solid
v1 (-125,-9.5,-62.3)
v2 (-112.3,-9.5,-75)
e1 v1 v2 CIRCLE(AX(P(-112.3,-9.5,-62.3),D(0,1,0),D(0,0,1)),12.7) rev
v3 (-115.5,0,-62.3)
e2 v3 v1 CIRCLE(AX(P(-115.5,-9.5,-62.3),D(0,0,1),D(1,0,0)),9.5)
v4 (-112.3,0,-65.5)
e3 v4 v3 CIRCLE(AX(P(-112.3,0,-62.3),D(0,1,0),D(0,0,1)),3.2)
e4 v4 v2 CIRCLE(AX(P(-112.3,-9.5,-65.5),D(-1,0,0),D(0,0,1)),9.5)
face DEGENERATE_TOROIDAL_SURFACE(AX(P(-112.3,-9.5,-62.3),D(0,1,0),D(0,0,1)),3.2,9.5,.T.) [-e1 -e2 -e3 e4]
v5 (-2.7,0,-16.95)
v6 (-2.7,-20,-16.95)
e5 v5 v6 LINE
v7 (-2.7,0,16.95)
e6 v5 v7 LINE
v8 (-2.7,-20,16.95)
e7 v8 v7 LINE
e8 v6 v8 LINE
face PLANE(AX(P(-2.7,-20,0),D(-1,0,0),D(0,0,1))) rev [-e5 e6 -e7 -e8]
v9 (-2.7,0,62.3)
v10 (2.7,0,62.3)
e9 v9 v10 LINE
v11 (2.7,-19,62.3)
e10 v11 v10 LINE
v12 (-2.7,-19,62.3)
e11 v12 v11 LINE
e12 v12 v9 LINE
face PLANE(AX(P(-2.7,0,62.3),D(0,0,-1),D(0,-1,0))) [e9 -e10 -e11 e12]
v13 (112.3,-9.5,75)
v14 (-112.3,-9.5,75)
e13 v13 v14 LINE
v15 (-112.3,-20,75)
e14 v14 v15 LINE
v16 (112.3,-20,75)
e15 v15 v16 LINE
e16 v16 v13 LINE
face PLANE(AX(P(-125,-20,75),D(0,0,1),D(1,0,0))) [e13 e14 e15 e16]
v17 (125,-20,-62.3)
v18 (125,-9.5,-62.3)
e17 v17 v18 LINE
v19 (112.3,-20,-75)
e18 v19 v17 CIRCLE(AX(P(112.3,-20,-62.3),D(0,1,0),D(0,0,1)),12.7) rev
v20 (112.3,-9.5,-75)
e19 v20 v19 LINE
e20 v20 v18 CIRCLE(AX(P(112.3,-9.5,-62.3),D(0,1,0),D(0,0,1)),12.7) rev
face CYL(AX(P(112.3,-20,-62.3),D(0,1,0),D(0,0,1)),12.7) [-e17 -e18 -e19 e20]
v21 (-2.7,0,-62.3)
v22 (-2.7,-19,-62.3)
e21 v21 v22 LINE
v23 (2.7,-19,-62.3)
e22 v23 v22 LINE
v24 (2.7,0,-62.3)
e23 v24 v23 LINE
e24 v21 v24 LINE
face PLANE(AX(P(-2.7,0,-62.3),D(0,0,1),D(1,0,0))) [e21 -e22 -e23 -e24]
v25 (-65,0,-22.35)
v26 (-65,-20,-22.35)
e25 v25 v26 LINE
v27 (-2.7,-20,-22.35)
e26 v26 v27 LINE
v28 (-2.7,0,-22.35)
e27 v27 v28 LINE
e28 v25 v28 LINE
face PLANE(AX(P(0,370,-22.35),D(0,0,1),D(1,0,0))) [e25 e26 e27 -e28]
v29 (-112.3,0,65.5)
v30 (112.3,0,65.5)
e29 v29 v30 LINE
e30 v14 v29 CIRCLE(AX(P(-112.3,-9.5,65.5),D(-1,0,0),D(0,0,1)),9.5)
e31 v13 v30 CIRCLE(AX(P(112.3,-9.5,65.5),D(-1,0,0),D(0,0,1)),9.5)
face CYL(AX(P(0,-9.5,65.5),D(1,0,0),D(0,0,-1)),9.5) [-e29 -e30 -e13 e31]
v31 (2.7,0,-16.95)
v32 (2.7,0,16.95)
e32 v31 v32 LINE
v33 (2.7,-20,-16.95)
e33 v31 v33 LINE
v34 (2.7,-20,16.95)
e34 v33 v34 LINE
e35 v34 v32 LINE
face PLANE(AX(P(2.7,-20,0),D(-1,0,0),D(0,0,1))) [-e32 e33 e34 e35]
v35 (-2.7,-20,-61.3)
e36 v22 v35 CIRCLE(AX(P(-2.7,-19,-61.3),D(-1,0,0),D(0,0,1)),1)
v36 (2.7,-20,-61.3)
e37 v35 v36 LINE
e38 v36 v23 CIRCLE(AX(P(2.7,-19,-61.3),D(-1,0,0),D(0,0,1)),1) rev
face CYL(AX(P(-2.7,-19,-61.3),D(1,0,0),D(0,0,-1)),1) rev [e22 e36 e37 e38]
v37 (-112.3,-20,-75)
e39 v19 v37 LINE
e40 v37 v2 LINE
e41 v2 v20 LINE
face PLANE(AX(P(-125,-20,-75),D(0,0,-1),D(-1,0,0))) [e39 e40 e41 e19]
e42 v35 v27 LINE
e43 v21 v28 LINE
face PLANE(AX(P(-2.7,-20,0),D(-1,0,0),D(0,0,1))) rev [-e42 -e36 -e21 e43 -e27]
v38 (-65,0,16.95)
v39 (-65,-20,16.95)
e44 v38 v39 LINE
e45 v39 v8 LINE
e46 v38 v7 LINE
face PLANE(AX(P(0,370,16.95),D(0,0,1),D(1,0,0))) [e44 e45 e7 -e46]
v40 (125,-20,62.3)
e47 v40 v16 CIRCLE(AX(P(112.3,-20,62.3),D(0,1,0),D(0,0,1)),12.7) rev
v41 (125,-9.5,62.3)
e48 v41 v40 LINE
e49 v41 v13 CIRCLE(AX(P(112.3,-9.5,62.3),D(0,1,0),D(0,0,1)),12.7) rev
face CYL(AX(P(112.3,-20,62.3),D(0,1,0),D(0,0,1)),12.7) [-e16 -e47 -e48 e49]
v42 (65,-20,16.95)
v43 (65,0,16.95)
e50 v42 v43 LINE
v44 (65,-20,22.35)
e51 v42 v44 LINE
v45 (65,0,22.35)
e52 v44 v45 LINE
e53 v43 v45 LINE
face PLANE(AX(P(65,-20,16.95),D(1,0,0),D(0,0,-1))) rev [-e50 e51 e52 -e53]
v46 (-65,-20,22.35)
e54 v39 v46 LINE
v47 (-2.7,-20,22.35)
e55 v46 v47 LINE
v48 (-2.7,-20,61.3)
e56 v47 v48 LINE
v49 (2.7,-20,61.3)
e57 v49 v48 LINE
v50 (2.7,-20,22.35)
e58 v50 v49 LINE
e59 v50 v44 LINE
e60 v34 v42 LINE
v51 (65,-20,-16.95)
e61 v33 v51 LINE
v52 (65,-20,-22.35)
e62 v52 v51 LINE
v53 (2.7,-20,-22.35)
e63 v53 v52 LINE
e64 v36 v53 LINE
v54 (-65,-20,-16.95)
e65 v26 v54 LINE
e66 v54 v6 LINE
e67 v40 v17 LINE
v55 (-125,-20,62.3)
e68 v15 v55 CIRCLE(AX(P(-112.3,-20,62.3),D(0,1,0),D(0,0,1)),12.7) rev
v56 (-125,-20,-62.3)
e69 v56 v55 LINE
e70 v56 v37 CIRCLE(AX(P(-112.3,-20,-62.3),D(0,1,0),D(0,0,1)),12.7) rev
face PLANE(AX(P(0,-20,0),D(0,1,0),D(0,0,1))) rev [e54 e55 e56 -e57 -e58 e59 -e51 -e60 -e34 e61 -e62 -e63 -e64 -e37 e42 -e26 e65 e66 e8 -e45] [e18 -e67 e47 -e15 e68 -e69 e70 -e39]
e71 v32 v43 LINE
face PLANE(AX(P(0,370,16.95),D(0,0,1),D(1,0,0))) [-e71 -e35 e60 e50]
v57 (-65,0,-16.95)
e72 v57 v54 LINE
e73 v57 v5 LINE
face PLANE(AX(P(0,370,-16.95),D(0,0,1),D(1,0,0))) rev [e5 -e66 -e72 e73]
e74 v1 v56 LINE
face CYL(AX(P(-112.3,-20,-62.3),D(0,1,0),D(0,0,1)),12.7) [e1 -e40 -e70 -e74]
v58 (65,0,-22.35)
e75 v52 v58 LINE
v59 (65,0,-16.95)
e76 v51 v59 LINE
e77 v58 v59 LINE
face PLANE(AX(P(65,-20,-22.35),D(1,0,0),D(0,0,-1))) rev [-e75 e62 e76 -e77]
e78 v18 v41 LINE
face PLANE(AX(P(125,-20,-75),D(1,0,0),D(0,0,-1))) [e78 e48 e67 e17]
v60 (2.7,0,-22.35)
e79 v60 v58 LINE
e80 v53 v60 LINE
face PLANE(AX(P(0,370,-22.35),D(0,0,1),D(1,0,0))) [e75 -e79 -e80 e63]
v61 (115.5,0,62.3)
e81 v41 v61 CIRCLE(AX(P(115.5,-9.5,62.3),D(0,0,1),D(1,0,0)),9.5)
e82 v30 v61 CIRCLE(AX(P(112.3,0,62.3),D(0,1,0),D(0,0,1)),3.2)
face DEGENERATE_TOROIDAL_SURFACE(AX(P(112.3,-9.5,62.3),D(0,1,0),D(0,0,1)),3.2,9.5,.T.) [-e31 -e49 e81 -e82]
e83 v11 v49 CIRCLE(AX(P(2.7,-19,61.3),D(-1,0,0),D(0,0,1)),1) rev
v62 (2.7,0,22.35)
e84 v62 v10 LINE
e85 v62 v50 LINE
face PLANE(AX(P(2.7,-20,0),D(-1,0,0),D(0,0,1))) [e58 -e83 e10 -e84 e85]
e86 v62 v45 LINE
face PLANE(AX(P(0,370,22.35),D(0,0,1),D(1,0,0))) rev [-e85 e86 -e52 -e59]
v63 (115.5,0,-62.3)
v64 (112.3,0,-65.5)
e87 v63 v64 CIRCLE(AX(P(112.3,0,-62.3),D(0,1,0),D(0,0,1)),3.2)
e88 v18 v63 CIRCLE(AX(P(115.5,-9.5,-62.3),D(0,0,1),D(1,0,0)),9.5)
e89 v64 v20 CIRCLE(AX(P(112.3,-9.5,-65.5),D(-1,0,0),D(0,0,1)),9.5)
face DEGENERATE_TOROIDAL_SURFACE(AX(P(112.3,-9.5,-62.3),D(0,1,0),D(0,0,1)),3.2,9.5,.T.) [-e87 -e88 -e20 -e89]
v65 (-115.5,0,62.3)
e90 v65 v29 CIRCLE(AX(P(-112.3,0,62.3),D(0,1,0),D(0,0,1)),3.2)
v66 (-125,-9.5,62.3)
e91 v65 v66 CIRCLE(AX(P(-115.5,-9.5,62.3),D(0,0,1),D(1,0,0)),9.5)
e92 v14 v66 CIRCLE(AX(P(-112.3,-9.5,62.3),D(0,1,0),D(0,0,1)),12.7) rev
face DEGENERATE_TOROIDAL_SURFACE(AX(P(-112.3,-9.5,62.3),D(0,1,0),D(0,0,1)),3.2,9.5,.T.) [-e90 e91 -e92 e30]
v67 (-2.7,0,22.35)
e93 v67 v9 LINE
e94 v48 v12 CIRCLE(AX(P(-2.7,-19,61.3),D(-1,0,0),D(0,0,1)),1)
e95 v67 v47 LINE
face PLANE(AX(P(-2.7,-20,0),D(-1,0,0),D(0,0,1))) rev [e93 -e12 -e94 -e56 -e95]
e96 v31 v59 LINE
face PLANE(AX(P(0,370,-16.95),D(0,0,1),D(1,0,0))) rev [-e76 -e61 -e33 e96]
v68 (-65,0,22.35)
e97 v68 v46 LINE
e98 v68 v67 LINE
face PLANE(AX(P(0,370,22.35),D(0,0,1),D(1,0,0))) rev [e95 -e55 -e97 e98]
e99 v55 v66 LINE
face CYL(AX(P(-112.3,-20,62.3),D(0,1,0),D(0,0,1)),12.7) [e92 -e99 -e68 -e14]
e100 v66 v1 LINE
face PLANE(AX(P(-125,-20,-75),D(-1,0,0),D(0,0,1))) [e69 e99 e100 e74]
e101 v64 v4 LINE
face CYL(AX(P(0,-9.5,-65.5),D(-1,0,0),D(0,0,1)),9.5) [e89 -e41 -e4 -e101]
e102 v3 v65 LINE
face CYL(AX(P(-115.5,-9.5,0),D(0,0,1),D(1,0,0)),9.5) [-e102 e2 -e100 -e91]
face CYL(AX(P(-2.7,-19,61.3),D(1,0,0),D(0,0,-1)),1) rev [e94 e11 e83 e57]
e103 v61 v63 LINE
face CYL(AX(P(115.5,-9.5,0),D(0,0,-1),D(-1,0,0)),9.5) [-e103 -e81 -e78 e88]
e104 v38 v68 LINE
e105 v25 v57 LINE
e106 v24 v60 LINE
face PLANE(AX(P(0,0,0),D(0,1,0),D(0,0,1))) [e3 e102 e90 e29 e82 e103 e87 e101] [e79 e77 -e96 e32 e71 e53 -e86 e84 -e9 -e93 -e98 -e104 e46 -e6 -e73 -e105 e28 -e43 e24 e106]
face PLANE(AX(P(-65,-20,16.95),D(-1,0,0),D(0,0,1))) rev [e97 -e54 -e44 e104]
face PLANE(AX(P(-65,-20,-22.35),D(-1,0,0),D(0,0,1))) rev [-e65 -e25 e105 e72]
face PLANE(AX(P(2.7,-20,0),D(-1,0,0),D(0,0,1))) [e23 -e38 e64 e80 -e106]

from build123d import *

# Parameters (mm, degrees)
SKETCH1_W           = 250
SKETCH1_H           = 150
BOSS_EXTRUDE1_DEPTH = 20
FILLET1_R           = 12.7
FILLET2_R           = 9.5
CAVITY1_START       = -65
CAVITY1_OUTLINE_W   = 20
CAVITY1_OUTLINE_H   = 5.4
CAVITY1_DEPTH       = 130
CAVITY1_START_2     = -2.7
CAVITY1_2_OUTLINE_W = 20
CAVITY1_2_OUTLINE_H = 33.9
CAVITY1_2_DEPTH     = 5.4


# Read off the part's stored shape, not the designer's step: Cavity1
with BuildPart() as part:
    # Sketch1 → Boss-Extrude1 (new body)
    with BuildSketch(Plane(origin=(0, 0, 0), x_dir=(1, 0, 0), z_dir=(0, 1, 0))):
        Rectangle(SKETCH1_W, SKETCH1_H)
    extrude(amount=-BOSS_EXTRUDE1_DEPTH)

    # Fillet1
    fillet1_edges = [part.edges().sort_by_distance(p)[0] for p in [
        (125, -10, 75),
        (-125, -10, 75),
        (-125, -10, -75),
        (125, -10, -75),
    ]]
    fillet(fillet1_edges, radius=FILLET1_R)

    # Fillet2
    fillet2_edges = [part.edges().sort_by_distance(p)[0] for p in [
        (0, 0, -75),
        (125, 0, 0),
        (-125, 0, 0),
        (0, 0, 75),
        (121.280256121, 0, 71.280256121),
        (-121.280256121, 0, 71.280256121),
        (121.280256121, 0, -71.280256121),
        (-121.280256121, 0, -71.280256121),
    ]]
    fillet(fillet2_edges, radius=FILLET2_R)

    # Cavity1 outline → Cavity1 (cut)
    with BuildSketch(Plane.YZ.offset(CAVITY1_START)):
        with Locations((-10, 19.65)):
            Rectangle(CAVITY1_OUTLINE_W, CAVITY1_OUTLINE_H)
        with Locations((-10, -19.65)):
            Rectangle(CAVITY1_OUTLINE_W, CAVITY1_OUTLINE_H)
    extrude(amount=CAVITY1_DEPTH, mode=Mode.SUBTRACT)

    # Cavity1 2 outline → Cavity1 2 (cut)
    with BuildSketch(Plane.YZ.offset(CAVITY1_START_2)):
        with Locations((-10, 0)):
            Rectangle(CAVITY1_2_OUTLINE_W, CAVITY1_2_OUTLINE_H)
        with BuildLine():
            Line((-20, 22.35), (0, 22.35))
            Line((0, 22.35), (0, 62.3))
            Line((0, 62.3), (-19, 62.3))
            ThreePointArc((-19, 62.3), (-19.707106781, 62.007106781), (-20, 61.3))
            Line((-20, 61.3), (-20, 22.35))
        make_face()
        with BuildLine():
            Line((0, -62.3), (0, -22.35))
            Line((0, -22.35), (-20, -22.35))
            Line((-20, -22.35), (-20, -61.3))
            ThreePointArc((-20, -61.3), (-19.707106781, -62.007106781), (-19, -62.3))
            Line((-19, -62.3), (0, -62.3))
        make_face()
    extrude(amount=CAVITY1_2_DEPTH, mode=Mode.SUBTRACT)


solid = part.part
